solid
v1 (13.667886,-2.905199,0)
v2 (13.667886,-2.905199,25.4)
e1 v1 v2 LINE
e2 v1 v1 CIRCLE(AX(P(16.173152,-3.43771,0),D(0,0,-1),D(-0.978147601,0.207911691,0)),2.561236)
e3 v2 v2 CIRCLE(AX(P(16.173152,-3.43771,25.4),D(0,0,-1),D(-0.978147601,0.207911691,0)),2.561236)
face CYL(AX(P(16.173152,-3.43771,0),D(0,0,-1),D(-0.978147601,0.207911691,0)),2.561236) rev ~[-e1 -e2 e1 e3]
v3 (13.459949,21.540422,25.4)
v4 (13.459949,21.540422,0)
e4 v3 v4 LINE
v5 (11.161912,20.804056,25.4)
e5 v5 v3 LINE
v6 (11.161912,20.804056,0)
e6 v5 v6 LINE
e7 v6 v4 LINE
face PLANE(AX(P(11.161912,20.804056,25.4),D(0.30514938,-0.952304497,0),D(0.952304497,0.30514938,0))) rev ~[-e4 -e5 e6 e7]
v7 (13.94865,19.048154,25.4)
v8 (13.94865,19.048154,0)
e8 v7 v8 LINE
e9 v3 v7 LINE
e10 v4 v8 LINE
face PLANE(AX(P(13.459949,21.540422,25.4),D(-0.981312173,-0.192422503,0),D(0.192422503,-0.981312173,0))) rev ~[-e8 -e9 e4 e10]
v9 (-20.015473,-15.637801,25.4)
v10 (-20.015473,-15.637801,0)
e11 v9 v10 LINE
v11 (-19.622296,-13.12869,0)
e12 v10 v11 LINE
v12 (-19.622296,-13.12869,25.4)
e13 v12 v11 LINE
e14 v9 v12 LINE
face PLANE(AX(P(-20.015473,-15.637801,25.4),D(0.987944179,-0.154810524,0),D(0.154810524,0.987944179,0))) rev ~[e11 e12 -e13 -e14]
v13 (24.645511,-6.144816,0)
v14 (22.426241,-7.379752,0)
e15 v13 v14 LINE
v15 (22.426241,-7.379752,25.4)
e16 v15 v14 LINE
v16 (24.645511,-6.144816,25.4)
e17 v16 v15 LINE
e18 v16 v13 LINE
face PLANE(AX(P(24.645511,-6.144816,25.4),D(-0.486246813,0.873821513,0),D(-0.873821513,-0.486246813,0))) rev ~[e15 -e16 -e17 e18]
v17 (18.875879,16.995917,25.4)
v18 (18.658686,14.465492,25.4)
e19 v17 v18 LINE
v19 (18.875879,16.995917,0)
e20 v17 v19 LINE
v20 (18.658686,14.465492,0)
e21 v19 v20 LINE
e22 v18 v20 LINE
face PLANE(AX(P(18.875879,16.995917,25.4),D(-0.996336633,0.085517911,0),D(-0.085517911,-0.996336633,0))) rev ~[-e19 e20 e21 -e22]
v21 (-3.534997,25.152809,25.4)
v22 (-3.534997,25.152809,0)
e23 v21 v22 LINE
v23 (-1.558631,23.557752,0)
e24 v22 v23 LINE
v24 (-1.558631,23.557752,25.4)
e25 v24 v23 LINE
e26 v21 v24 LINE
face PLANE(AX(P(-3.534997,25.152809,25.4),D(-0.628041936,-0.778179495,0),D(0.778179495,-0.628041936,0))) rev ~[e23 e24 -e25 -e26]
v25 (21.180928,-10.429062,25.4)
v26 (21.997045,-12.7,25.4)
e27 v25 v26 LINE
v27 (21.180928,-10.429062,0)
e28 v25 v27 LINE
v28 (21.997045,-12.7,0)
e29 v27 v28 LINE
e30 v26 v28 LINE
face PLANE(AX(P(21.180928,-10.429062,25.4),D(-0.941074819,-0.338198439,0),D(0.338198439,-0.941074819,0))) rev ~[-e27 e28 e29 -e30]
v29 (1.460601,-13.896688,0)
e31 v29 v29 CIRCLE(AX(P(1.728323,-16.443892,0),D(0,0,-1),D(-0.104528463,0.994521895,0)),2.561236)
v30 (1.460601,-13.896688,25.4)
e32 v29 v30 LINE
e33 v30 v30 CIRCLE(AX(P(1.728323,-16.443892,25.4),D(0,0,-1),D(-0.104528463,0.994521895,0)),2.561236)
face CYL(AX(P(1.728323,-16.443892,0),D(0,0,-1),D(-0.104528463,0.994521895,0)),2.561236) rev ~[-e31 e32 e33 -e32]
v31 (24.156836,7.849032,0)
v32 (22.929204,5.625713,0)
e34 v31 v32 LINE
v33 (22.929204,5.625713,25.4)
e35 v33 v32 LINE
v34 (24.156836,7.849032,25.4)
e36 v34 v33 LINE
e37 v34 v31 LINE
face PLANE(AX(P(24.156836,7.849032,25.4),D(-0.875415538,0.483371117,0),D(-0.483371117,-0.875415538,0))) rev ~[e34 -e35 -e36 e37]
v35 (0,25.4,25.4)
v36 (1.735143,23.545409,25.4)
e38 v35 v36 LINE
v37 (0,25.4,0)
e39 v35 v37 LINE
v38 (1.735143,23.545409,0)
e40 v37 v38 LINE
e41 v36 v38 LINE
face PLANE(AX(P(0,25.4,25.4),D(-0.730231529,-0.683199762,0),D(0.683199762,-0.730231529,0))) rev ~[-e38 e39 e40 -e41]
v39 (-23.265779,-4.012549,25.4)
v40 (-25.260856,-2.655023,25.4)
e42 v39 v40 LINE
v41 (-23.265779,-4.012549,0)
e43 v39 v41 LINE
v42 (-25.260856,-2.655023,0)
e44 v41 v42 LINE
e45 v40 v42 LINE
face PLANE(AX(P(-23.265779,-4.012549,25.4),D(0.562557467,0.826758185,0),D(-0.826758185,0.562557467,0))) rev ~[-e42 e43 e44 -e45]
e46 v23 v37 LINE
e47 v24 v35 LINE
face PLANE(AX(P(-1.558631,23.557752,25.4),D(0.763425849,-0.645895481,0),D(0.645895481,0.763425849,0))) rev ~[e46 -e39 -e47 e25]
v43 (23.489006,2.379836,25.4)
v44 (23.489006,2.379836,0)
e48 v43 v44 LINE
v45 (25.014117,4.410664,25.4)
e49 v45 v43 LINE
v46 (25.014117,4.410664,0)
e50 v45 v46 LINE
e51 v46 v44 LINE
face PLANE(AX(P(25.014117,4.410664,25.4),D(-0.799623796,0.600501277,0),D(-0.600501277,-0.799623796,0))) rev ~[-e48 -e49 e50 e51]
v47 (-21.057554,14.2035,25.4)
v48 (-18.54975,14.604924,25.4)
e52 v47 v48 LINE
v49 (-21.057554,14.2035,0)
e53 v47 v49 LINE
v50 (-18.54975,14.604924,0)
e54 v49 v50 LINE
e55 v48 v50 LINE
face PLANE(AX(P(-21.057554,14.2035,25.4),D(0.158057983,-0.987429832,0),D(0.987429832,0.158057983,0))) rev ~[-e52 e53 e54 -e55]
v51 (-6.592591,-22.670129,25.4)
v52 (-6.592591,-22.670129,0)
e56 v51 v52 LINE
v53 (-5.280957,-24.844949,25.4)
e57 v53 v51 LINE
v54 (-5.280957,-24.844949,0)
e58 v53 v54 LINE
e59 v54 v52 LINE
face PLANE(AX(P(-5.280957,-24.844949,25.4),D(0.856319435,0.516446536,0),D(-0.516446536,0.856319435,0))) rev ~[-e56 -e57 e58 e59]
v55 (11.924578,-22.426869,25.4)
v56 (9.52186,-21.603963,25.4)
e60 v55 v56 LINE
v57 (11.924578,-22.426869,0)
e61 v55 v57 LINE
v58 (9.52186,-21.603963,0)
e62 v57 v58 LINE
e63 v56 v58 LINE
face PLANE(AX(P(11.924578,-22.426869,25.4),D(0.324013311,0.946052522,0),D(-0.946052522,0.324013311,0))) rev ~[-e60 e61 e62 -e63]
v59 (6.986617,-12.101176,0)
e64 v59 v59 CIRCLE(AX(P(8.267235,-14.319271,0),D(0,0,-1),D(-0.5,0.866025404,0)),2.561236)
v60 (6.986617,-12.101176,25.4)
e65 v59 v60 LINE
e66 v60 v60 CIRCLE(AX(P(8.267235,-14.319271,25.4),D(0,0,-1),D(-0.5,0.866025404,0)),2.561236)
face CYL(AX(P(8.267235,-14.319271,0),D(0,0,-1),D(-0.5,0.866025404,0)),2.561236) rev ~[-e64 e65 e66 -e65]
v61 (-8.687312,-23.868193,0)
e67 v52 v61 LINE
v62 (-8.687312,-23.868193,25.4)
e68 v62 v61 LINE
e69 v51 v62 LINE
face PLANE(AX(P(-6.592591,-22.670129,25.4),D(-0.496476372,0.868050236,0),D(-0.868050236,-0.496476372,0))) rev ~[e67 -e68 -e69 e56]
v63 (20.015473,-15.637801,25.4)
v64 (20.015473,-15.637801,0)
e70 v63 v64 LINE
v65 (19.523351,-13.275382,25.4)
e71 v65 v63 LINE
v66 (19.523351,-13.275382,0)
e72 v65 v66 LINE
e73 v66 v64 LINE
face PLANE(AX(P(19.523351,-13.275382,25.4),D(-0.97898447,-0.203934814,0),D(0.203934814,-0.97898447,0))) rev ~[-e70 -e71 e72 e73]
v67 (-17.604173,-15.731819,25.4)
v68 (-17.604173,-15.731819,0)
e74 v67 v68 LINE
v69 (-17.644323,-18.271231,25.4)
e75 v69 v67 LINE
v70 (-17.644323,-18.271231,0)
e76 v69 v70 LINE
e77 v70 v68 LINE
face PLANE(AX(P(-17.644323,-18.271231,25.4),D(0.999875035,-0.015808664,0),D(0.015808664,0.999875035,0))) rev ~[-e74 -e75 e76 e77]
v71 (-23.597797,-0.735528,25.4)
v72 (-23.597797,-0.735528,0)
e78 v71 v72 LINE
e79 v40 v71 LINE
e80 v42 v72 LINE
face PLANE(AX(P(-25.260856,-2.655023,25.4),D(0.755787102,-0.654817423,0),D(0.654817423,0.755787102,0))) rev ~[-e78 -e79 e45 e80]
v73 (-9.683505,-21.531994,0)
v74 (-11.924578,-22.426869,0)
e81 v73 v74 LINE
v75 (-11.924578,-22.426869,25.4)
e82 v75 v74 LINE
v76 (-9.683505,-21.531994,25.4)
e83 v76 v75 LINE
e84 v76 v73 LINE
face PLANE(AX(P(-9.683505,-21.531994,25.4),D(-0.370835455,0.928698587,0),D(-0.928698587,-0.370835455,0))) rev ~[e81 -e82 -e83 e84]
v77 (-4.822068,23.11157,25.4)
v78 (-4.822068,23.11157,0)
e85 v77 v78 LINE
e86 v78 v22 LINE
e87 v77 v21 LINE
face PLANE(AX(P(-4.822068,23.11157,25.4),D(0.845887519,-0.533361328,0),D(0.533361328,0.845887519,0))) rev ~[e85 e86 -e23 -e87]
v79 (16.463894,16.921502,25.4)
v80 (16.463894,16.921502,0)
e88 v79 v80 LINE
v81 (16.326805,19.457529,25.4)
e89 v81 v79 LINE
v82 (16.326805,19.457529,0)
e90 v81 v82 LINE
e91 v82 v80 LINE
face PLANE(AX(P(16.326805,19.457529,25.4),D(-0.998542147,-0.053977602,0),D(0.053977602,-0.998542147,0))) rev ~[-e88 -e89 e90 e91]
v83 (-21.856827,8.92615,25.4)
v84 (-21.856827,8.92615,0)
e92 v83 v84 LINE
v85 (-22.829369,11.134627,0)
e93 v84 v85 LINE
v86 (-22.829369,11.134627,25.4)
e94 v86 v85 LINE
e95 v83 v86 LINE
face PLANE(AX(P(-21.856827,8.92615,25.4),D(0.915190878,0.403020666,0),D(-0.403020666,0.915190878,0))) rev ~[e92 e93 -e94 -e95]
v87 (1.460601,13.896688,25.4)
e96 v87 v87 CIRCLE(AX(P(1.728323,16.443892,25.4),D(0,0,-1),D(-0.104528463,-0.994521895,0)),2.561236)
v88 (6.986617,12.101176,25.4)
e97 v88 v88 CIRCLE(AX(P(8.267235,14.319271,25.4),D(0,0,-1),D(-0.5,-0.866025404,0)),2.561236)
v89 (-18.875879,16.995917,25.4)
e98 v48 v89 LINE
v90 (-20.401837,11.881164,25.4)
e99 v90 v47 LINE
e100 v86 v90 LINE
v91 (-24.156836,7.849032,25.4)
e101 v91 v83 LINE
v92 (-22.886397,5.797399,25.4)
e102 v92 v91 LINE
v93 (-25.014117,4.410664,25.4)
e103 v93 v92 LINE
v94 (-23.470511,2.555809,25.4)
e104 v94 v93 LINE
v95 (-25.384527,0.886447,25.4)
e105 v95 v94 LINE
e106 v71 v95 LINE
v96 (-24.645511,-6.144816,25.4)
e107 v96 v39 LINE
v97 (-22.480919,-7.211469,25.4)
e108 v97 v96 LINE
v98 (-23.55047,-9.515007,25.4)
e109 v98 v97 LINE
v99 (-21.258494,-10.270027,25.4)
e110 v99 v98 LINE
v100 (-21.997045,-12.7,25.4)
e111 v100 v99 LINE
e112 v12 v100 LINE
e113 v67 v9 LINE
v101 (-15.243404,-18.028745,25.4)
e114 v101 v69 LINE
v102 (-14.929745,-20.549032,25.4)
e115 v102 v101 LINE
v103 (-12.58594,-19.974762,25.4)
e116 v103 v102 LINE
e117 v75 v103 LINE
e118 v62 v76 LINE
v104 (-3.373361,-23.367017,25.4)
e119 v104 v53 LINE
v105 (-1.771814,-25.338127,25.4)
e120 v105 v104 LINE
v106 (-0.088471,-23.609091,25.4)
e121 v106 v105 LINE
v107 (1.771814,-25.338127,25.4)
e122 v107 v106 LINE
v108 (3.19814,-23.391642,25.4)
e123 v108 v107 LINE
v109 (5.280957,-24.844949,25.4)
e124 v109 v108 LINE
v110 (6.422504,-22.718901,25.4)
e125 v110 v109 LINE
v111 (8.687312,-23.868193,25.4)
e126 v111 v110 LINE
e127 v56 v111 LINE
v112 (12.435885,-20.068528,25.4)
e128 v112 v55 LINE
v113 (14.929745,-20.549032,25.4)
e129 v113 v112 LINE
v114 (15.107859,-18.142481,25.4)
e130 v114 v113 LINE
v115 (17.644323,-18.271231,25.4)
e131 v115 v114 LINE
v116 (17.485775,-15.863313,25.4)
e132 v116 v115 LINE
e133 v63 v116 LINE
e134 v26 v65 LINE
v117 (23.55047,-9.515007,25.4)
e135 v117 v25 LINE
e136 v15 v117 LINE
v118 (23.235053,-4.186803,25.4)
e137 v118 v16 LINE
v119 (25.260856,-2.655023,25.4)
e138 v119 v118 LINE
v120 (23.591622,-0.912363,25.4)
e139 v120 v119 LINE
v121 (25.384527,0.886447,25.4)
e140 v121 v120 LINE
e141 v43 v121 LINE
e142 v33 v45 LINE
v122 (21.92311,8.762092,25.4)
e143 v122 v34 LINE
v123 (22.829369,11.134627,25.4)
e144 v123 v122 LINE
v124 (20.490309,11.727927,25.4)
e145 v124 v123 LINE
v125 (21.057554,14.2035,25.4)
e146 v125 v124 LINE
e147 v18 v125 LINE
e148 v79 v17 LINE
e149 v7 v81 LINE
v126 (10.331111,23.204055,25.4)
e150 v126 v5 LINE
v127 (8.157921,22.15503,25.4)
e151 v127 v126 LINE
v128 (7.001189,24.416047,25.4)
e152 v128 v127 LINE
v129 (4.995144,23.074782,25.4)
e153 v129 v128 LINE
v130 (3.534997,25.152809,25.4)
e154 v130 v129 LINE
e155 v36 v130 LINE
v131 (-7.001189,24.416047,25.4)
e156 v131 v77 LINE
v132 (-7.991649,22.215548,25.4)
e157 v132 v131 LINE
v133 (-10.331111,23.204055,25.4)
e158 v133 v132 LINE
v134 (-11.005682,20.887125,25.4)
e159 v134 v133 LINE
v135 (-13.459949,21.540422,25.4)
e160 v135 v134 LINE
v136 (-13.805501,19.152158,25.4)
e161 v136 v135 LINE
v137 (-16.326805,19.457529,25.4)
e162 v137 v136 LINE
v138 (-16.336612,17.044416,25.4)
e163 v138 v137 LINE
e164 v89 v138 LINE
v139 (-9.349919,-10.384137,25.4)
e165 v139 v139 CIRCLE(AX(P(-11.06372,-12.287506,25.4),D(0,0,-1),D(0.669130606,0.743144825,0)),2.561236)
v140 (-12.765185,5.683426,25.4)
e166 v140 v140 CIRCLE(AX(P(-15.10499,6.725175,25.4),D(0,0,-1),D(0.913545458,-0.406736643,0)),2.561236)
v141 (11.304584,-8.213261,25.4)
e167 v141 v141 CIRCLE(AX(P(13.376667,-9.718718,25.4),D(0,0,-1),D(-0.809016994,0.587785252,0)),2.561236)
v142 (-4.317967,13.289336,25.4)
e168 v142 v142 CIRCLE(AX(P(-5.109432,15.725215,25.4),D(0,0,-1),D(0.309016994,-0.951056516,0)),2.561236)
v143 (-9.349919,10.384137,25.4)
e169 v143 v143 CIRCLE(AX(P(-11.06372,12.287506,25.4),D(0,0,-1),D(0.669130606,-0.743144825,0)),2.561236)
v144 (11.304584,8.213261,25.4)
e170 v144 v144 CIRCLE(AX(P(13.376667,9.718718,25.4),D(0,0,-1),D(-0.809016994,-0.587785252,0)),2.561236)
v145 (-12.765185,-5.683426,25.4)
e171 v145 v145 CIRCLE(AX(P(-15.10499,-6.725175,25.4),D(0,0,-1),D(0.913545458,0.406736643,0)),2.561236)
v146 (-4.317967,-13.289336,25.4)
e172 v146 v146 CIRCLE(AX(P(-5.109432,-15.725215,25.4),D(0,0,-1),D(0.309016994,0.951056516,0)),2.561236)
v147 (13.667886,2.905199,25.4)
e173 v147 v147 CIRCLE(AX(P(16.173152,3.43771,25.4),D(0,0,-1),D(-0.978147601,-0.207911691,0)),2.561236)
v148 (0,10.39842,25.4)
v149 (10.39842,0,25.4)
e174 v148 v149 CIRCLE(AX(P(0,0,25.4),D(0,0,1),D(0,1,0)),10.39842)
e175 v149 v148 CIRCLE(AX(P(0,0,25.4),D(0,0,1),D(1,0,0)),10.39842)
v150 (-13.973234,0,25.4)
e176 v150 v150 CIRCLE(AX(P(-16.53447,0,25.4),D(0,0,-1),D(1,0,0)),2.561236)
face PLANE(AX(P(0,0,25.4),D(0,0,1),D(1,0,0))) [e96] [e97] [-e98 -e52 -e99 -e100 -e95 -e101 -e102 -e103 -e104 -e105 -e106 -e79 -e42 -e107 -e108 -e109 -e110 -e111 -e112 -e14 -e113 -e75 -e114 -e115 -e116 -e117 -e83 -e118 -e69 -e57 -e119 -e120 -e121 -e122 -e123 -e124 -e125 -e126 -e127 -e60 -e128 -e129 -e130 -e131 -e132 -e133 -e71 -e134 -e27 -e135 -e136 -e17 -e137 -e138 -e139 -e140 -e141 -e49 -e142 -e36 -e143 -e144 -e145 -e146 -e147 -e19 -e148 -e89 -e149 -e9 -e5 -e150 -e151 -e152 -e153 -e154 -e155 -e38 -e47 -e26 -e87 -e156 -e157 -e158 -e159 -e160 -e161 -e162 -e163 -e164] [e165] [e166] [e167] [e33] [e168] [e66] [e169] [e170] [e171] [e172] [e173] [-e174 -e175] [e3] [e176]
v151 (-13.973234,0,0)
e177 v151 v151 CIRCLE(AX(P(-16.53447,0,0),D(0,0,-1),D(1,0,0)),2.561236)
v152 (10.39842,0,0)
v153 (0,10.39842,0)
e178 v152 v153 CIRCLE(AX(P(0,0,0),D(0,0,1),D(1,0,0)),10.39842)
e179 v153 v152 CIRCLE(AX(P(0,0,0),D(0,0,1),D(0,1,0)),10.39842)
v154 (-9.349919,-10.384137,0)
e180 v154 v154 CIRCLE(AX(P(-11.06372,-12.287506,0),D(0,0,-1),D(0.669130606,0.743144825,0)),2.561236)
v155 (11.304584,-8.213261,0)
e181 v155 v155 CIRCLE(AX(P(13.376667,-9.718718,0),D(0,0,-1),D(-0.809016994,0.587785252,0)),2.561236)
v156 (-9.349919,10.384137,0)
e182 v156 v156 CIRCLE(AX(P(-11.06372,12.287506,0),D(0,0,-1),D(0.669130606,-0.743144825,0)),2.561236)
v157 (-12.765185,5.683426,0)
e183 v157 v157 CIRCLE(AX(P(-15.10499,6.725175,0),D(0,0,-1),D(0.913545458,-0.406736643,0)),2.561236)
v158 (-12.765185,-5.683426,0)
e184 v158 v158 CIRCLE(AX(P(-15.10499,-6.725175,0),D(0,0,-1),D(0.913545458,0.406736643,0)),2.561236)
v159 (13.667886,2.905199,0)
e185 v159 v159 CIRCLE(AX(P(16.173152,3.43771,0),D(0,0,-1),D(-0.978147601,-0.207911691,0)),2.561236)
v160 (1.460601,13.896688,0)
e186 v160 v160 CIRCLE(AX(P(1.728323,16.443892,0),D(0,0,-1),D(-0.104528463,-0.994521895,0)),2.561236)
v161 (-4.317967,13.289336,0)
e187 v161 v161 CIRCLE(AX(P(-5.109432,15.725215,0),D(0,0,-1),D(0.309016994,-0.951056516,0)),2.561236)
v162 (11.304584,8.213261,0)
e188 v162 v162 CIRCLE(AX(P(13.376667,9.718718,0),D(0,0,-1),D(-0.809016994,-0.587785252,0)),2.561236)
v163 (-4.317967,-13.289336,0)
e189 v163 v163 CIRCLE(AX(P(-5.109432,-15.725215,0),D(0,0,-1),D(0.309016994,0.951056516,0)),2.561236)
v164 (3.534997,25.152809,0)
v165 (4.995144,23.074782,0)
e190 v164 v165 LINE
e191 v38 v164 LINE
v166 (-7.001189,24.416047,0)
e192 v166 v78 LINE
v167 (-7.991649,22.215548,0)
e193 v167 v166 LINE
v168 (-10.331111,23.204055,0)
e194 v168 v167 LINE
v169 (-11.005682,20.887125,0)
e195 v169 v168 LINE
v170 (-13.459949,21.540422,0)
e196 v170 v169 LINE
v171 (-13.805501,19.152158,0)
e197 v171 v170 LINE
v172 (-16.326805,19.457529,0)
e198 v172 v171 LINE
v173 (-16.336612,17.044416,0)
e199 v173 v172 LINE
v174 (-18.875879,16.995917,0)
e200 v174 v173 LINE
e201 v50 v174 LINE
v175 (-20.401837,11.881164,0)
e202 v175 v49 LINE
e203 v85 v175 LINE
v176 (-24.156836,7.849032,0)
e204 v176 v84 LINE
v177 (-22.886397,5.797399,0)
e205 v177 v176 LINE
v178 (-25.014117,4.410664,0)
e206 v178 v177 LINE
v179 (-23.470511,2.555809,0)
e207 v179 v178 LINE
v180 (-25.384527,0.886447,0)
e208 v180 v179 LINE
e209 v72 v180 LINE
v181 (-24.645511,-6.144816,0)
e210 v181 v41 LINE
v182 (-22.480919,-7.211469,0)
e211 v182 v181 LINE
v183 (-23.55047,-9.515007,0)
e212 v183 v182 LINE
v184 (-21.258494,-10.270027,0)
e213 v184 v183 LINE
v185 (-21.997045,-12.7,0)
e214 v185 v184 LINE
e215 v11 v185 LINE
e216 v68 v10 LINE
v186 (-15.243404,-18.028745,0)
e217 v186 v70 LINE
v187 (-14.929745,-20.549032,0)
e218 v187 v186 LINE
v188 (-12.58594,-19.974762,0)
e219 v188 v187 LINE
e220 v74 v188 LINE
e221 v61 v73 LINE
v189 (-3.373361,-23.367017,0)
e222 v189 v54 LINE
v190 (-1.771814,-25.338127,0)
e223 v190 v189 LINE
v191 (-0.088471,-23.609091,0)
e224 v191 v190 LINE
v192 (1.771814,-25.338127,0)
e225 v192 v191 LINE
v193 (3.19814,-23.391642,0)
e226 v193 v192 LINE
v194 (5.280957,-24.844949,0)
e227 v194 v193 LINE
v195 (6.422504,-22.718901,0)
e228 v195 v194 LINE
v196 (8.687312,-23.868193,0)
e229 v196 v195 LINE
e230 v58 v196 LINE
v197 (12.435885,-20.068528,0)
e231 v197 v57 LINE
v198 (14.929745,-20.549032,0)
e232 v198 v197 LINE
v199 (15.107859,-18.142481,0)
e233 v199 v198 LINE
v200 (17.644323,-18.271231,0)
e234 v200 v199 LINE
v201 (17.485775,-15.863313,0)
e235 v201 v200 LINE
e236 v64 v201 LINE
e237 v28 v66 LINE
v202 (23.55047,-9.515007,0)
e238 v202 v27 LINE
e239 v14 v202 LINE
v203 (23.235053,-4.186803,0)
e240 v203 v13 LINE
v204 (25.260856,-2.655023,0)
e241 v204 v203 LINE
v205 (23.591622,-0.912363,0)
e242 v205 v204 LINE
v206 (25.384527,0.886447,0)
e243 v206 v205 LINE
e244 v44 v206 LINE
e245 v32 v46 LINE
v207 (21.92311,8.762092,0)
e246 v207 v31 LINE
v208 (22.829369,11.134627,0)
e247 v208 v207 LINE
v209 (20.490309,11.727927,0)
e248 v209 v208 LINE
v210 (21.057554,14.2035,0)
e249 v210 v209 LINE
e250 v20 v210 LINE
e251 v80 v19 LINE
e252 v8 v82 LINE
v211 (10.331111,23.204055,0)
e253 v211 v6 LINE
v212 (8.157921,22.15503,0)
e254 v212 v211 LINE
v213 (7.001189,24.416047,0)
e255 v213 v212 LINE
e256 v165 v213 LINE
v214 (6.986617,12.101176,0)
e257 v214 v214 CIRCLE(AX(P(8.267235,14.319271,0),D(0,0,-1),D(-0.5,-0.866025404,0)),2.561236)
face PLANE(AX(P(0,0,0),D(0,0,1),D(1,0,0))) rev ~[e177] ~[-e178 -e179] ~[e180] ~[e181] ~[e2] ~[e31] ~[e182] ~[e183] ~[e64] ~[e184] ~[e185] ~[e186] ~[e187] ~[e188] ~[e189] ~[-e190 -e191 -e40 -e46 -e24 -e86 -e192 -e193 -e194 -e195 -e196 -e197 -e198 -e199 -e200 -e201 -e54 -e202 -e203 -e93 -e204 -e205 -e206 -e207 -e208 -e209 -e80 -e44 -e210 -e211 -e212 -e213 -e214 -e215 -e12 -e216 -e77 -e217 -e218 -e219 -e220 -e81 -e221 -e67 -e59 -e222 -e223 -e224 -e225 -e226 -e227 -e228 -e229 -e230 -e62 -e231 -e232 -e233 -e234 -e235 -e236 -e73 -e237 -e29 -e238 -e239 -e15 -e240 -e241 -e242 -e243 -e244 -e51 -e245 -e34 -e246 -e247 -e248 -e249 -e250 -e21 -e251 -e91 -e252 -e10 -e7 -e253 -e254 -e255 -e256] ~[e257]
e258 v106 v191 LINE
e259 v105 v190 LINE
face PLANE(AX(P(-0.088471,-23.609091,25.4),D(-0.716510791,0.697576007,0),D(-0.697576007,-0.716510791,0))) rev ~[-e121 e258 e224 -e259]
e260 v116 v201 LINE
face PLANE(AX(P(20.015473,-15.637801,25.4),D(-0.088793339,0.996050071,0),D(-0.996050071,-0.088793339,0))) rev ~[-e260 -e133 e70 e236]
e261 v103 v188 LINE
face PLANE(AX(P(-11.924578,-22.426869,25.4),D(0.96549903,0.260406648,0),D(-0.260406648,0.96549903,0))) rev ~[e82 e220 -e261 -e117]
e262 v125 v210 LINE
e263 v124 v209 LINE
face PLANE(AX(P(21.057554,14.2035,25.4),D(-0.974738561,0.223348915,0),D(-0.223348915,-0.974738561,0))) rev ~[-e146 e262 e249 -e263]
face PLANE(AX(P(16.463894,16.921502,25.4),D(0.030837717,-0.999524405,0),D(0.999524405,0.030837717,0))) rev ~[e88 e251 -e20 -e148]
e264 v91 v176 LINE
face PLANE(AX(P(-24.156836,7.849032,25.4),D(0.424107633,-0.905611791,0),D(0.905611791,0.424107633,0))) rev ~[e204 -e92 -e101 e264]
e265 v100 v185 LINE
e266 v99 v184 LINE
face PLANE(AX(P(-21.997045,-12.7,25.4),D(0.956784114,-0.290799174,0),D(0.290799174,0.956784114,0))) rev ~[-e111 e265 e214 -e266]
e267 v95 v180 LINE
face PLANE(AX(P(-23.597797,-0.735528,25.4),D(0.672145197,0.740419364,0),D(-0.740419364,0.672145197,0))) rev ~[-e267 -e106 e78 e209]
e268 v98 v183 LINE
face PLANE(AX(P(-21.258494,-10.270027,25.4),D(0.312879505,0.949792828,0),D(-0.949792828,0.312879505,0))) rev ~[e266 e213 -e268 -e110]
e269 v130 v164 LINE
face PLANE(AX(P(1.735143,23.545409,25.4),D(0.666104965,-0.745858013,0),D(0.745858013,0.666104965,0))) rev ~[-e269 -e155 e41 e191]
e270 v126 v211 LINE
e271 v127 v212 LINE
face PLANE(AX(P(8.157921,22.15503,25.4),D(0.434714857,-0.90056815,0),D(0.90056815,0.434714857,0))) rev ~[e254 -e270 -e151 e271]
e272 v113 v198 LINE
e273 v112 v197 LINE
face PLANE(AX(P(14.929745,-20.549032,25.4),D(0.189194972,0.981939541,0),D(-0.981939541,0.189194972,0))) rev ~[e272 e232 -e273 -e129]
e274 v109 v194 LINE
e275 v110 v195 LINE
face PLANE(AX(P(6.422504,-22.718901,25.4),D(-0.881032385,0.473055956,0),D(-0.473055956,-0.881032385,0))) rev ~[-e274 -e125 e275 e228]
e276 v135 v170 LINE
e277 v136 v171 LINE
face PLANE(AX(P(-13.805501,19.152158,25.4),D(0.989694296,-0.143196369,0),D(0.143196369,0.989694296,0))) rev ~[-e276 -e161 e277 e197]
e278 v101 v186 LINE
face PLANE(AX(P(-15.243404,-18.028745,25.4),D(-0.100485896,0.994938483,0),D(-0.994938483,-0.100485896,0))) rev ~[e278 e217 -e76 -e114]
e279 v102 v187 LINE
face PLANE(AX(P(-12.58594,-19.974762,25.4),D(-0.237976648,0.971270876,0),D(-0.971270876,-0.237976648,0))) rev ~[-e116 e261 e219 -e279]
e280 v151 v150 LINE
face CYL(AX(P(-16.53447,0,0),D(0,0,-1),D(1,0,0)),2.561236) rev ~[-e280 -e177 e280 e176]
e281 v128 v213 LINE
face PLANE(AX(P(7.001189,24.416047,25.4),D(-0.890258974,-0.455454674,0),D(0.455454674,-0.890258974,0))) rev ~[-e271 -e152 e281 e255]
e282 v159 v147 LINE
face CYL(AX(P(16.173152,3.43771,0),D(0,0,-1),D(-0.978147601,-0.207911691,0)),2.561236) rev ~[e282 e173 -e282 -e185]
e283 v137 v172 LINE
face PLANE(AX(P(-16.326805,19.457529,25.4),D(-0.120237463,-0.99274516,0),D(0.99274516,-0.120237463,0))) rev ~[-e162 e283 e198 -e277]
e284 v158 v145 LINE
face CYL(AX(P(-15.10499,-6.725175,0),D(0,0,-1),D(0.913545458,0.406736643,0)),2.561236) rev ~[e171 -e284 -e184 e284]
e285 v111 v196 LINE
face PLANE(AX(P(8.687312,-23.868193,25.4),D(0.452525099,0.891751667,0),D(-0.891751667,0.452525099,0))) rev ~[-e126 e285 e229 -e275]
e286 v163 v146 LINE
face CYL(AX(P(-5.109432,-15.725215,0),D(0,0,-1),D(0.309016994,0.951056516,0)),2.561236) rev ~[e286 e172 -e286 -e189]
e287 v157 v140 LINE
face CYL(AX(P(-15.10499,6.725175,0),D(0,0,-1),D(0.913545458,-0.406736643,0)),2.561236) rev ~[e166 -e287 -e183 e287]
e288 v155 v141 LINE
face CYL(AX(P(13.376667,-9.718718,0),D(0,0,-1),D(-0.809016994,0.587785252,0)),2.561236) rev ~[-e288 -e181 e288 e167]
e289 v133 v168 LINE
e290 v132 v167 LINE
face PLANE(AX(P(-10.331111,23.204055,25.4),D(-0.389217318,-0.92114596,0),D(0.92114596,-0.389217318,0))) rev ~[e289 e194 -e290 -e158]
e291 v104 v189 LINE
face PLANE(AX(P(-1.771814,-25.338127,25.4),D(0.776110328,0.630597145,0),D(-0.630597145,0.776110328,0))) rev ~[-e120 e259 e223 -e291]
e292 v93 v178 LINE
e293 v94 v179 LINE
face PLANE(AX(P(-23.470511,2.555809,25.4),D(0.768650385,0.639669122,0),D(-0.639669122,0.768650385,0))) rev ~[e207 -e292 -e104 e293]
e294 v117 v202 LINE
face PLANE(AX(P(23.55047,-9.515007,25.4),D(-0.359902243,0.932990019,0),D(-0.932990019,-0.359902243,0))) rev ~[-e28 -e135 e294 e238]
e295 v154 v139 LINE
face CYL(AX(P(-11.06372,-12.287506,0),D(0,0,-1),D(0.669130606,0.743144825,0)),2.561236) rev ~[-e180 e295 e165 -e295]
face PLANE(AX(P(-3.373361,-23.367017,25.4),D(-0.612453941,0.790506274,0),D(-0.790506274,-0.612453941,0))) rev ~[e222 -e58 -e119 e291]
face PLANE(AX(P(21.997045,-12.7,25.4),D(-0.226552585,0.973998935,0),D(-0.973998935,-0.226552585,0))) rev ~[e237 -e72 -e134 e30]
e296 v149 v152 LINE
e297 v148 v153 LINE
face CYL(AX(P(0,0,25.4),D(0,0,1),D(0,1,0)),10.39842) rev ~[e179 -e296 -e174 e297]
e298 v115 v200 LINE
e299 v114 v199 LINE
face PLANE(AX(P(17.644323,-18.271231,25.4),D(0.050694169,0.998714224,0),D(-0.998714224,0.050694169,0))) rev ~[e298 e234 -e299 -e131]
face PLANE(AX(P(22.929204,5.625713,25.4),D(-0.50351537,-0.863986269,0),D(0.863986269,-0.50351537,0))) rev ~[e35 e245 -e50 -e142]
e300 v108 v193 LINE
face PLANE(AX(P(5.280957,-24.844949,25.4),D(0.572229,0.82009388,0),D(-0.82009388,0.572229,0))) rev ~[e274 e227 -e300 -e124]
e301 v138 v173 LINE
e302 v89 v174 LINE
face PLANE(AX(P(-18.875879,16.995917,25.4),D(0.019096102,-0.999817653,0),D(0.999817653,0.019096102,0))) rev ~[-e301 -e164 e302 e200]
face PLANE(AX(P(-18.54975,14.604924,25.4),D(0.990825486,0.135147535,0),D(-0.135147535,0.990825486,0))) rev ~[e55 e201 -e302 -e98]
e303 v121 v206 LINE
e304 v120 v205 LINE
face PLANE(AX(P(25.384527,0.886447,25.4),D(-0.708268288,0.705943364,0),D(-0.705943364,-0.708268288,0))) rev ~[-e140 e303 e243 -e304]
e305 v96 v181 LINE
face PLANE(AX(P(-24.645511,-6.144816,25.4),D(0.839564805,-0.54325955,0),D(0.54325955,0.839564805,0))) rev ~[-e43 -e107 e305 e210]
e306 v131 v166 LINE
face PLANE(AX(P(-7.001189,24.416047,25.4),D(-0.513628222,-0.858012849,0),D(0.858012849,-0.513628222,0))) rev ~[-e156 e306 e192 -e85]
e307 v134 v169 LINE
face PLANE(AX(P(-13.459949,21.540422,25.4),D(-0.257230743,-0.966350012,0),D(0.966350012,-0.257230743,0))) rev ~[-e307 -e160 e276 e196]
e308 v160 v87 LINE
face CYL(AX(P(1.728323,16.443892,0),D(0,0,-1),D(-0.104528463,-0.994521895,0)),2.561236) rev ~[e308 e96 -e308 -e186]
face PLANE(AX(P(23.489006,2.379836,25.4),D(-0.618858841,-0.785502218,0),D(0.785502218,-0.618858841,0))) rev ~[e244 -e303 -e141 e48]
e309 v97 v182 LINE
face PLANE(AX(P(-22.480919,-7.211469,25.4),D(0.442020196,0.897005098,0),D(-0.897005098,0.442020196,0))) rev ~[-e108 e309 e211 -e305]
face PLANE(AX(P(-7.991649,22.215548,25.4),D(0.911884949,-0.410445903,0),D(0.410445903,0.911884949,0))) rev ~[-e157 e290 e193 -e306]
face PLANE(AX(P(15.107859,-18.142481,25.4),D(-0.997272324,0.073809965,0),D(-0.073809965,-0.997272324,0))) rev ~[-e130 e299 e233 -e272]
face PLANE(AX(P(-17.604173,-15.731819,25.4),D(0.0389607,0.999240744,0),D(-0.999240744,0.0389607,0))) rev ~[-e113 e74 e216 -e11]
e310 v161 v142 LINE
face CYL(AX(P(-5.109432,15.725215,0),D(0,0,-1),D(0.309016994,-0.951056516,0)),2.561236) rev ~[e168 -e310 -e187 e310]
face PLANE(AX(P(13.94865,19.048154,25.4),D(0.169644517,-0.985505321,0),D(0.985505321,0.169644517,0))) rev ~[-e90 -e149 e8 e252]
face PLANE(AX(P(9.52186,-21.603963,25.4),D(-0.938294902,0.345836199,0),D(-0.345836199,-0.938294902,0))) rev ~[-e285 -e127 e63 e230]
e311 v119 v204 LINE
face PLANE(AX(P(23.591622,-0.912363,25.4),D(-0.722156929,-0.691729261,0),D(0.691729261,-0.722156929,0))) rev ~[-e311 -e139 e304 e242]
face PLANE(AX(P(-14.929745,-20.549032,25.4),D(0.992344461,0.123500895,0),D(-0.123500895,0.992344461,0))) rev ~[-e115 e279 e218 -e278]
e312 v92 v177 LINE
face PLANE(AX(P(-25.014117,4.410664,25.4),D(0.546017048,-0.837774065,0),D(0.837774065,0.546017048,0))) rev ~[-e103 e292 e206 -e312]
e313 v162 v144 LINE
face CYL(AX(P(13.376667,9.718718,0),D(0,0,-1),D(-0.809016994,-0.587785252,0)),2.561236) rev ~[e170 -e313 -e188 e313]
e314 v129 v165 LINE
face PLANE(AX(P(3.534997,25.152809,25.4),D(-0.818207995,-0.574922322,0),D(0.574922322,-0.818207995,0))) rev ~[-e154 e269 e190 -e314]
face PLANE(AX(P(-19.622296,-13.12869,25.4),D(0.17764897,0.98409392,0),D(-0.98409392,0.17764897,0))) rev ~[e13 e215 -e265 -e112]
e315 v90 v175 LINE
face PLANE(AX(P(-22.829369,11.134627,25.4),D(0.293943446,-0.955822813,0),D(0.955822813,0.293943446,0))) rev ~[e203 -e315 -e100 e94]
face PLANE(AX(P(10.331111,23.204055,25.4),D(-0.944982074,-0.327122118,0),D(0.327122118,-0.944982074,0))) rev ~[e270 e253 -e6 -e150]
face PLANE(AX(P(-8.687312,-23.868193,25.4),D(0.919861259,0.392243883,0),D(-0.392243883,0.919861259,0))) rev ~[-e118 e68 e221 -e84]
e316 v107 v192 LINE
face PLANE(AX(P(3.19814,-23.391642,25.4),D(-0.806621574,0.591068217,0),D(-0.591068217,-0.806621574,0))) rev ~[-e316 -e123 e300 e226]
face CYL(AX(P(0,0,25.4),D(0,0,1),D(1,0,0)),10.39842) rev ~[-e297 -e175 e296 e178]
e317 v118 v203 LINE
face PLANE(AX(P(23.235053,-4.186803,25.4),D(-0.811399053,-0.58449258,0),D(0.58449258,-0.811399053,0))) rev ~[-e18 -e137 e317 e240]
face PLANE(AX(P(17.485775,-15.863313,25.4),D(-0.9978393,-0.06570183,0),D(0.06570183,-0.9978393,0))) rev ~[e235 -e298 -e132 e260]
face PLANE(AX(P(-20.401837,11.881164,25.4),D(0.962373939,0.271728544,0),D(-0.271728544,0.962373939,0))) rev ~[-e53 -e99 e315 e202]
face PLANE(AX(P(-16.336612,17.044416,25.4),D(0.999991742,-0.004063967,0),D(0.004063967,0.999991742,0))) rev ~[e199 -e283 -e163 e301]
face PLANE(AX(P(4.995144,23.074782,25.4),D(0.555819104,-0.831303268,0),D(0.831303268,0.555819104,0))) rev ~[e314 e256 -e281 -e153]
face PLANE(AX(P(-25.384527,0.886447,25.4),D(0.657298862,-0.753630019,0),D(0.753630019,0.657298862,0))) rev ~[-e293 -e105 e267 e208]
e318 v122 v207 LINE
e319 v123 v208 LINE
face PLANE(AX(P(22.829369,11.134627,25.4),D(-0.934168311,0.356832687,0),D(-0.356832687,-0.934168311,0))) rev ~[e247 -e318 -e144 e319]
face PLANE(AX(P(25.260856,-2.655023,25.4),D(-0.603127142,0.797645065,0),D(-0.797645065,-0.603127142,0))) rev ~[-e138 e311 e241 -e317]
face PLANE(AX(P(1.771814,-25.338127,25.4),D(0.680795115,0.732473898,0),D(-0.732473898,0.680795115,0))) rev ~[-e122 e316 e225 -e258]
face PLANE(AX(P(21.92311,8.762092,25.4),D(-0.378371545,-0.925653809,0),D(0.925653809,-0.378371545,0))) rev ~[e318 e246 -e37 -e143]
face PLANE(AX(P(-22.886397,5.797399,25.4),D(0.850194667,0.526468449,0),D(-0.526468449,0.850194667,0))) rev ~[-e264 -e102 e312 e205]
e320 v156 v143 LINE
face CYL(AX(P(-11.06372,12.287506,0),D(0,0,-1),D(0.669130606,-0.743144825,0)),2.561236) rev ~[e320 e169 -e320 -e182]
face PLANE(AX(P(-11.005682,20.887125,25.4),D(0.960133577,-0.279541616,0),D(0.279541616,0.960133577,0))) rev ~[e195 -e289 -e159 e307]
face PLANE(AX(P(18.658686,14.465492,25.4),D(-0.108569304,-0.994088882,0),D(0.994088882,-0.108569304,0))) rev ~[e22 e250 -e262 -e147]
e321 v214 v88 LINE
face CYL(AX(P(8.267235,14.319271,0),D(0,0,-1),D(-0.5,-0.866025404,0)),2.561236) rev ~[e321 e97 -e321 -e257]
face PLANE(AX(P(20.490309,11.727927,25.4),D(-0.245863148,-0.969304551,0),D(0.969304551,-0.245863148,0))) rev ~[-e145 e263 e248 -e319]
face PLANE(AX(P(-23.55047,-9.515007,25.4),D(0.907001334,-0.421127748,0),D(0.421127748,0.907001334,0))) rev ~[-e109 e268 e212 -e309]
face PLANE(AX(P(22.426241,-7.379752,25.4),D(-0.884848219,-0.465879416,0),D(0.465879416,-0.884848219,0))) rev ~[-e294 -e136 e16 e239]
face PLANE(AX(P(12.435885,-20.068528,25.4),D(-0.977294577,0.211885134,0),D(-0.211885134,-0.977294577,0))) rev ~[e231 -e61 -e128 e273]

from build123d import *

# Parameters (mm, degrees)
F0_R            = 25.4
F1_DEPTH        = 25.4
F3_DEPTH        = 25.4
F6_DEPTH        = 25.4
F5_DEPTH        = 25.4
F5_COPIES_COUNT = 15


# Not quite as in the source:
# - a pattern or mirror of a feature is missing from the dataset's text; its kind, count and spacing are read off the source's solid


with BuildPart() as f1:
    # F0 (on Top) → F1 (new body)
    with BuildSketch(Plane.XY):
        Circle(F0_R)
    extrude(amount=F1_DEPTH)

    # F2 (on face) → F3 (cut)
    with BuildSketch(Plane.XY.offset(25.4)):
        with BuildLine():
            Line((-3.3733606068, -23.3670165801), (-5.2809569468, -24.8449490586))
            ThreePointArc((-5.2809569468, -24.8449490586), (-3.5349967644, -25.152808946), (-1.7718144331, -25.3381268766))
            Line((-1.7718144331, -25.3381268766), (-3.3733606068, -23.3670165801))
        make_face()
        with BuildLine():
            Line((-0.0884711356, -23.6090914373), (-1.7718144331, -25.3381268766))
            ThreePointArc((-1.7718144331, -25.3381268766), (0, -25.4), (1.7718144331, -25.3381268766))
            Line((1.7718144331, -25.3381268766), (-0.0884711356, -23.6090914373))
        make_face()
        with BuildLine():
            ThreePointArc((1.7718144331, -25.3381268766), (3.5349967644, -25.152808946), (5.2809569468, -24.8449490586))
            Line((5.2809569468, -24.8449490586), (3.1981403256, -23.3916421847))
            Line((3.1981403256, -23.3916421847), (1.7718144331, -25.3381268766))
        make_face()
        with BuildLine():
            ThreePointArc((5.2809569468, -24.8449490586), (7.0011888378, -24.4160470768), (8.6873116405, -23.868192568))
            Line((8.6873116405, -23.868192568), (6.4225036232, -22.7189012245))
            Line((6.4225036232, -22.7189012245), (5.2809569468, -24.8449490586))
        make_face()
        with BuildLine():
            ThreePointArc((8.6873116405, -23.868192568), (10.3311107341, -23.2040546241), (11.9245776948, -22.4268688586))
            Line((11.9245776948, -22.4268688586), (9.5218601932, -21.6039626944))
            Line((9.5218601932, -21.6039626944), (8.6873116405, -23.868192568))
        make_face()
        with BuildLine():
            ThreePointArc((11.9245776948, -22.4268688586), (13.4599493115, -21.5404216424), (14.9297454082, -20.5490316571))
            Line((14.9297454082, -20.5490316571), (12.4358845856, -20.0685276045))
            Line((12.4358845856, -20.0685276045), (11.9245776948, -22.4268688586))
        make_face()
        with BuildLine():
            ThreePointArc((14.9297454082, -20.5490316571), (16.326805286, -19.4575288552), (17.6443226097, -18.2712309286))
            Line((17.6443226097, -18.2712309286), (15.1078586301, -18.1424814524))
            Line((15.1078586301, -18.1424814524), (14.9297454082, -20.5490316571))
        make_face()
        with BuildLine():
            ThreePointArc((17.6443226097, -18.2712309286), (18.8758785671, -16.9959174015), (20.0154731416, -15.6378014733))
            Line((20.0154731416, -15.6378014733), (17.4857753913, -15.8633125357))
            Line((17.4857753913, -15.8633125357), (17.6443226097, -18.2712309286))
        make_face()
        with BuildLine():
            ThreePointArc((20.0154731416, -15.6378014733), (21.0575543429, -14.2034997482), (21.9970452561, -12.7))
            Line((21.9970452561, -12.7), (19.5233514242, -13.2753822847))
            Line((19.5233514242, -13.2753822847), (20.0154731416, -15.6378014733))
        make_face()
        with BuildLine():
            ThreePointArc((21.9970452561, -12.7), (22.829368776, -11.1346271284), (23.550469906, -9.5150074728))
            Line((23.550469906, -9.5150074728), (21.1809276292, -10.429061818))
            Line((21.1809276292, -10.429061818), (21.9970452561, -12.7))
        make_face()
        with BuildLine():
            ThreePointArc((23.550469906, -9.5150074728), (24.1568355139, -7.8490316571), (24.6455114474, -6.1448161482))
            Line((24.6455114474, -6.1448161482), (22.4262411709, -7.3797515259))
            Line((22.4262411709, -7.3797515259), (23.550469906, -9.5150074728))
        make_face()
        with BuildLine():
            ThreePointArc((24.6455114474, -6.1448161482), (25.0141169265, -4.4106637127), (25.2608561424, -2.655022967))
            Line((25.2608561424, -2.655022967), (23.2350534376, -4.1868027647))
            Line((23.2350534376, -4.1868027647), (24.6455114474, -6.1448161482))
        make_face()
        with BuildLine():
            ThreePointArc((25.4, 0), (25.396131457, 0.4432911235), (25.3845270063, 0.8864472162))
            Line((25.3845270063, 0.8864472162), (23.5916218186, -0.9123626502))
            Line((23.5916218186, -0.9123626502), (25.2608561424, -2.655022967))
            ThreePointArc((25.2608561424, -2.655022967), (25.3651901828, -1.3293332886), (25.4, 0))
        make_face()
        with BuildLine():
            ThreePointArc((25.3845270063, 0.8864472162), (25.2608561424, 2.655022967), (25.0141169265, 4.4106637127))
            Line((25.0141169265, 4.4106637127), (23.489006116, 2.3798355656))
            Line((23.489006116, 2.3798355656), (25.3845270063, 0.8864472162))
        make_face()
        with BuildLine():
            ThreePointArc((25.0141169265, 4.4106637127), (24.6455114474, 6.1448161482), (24.1568355139, 7.8490316571))
            Line((24.1568355139, 7.8490316571), (22.9292036277, 5.6257129891))
            Line((22.9292036277, 5.6257129891), (25.0141169265, 4.4106637127))
        make_face()
        with BuildLine():
            ThreePointArc((24.1568355139, 7.8490316571), (23.550469906, 9.5150074728), (22.829368776, 11.1346271284))
            Line((22.829368776, 11.1346271284), (21.9231102724, 8.7620923084))
            Line((21.9231102724, 8.7620923084), (24.1568355139, 7.8490316571))
        make_face()
        with BuildLine():
            ThreePointArc((22.829368776, 11.1346271284), (21.9970452561, 12.7), (21.0575543429, 14.2034997482))
            Line((21.0575543429, 14.2034997482), (20.4903085128, 11.7279274677))
            Line((20.4903085128, 11.7279274677), (22.829368776, 11.1346271284))
        make_face()
        with BuildLine():
            ThreePointArc((21.0575543429, 14.2034997482), (20.0154731416, 15.6378014733), (18.8758785671, 16.9959174015))
            Line((18.8758785671, 16.9959174015), (18.6586862054, 14.4654918592))
            Line((18.6586862054, 14.4654918592), (21.0575543429, 14.2034997482))
        make_face()
        with BuildLine():
            ThreePointArc((18.8758785671, 16.9959174015), (17.6443226097, 18.2712309286), (16.326805286, 19.4575288552))
            Line((16.326805286, 19.4575288552), (16.4638937949, 16.9215019058))
            Line((16.4638937949, 16.9215019058), (18.8758785671, 16.9959174015))
        make_face()
        with BuildLine():
            ThreePointArc((16.326805286, 19.4575288552), (14.9297454082, 20.5490316571), (13.4599493115, 21.5404216424))
            Line((13.4599493115, 21.5404216424), (13.9486504191, 19.0481541658))
            Line((13.9486504191, 19.0481541658), (16.326805286, 19.4575288552))
        make_face()
        with BuildLine():
            ThreePointArc((13.4599493115, 21.5404216424), (11.9245776948, 22.4268688586), (10.3311107341, 23.2040546241))
            Line((10.3311107341, 23.2040546241), (11.1619124293, 20.8040557719))
            Line((11.1619124293, 20.8040557719), (13.4599493115, 21.5404216424))
        make_face()
        with BuildLine():
            ThreePointArc((10.3311107341, 23.2040546241), (8.6873116405, 23.868192568), (7.0011888378, 24.4160470768))
            Line((7.0011888378, 24.4160470768), (8.1579205105, 22.1550300966))
            Line((8.1579205105, 22.1550300966), (10.3311107341, 23.2040546241))
        make_face()
        with BuildLine():
            ThreePointArc((7.0011888378, 24.4160470768), (5.2809569468, 24.8449490586), (3.5349967644, 25.152808946))
            Line((3.5349967644, 25.152808946), (4.9951439484, 23.0747819615))
            Line((4.9951439484, 23.0747819615), (7.0011888378, 24.4160470768))
        make_face()
        with BuildLine():
            ThreePointArc((3.5349967644, 25.152808946), (1.7718144331, 25.3381268766), (0, 25.4))
            Line((0, 25.4), (1.7351425913, 23.5454094427))
            Line((1.7351425913, 23.5454094427), (3.5349967644, 25.152808946))
        make_face()
        with BuildLine():
            Line((-1.5586313426, 23.5577523116), (0, 25.4))
            ThreePointArc((0, 25.4), (-1.7718144331, 25.3381268766), (-3.5349967644, 25.152808946))
            Line((-3.5349967644, 25.152808946), (-1.5586313426, 23.5577523116))
        make_face()
        with BuildLine():
            Line((-4.8220682904, 23.1115703283), (-3.5349967644, 25.152808946))
            ThreePointArc((-3.5349967644, 25.152808946), (-5.2809569468, 24.8449490586), (-7.0011888378, 24.4160470768))
            Line((-7.0011888378, 24.4160470768), (-4.8220682904, 23.1115703283))
        make_face()
        with BuildLine():
            Line((-7.9916491639, 22.2155479176), (-7.0011888378, 24.4160470768))
            ThreePointArc((-7.0011888378, 24.4160470768), (-8.6873116405, 23.868192568), (-10.3311107341, 23.2040546241))
            Line((-10.3311107341, 23.2040546241), (-7.9916491639, 22.2155479176))
        make_face()
        with BuildLine():
            Line((-11.0056816768, 20.8871251365), (-10.3311107341, 23.2040546241))
            ThreePointArc((-10.3311107341, 23.2040546241), (-11.9245776948, 22.4268688586), (-13.4599493115, 21.5404216424))
            Line((-13.4599493115, 21.5404216424), (-11.0056816768, 20.8871251365))
        make_face()
        with BuildLine():
            Line((-13.8055011147, 19.1521582233), (-13.4599493115, 21.5404216424))
            ThreePointArc((-13.4599493115, 21.5404216424), (-14.9297454082, 20.5490316571), (-16.326805286, 19.4575288552))
            Line((-16.326805286, 19.4575288552), (-13.8055011147, 19.1521582233))
        make_face()
        with BuildLine():
            Line((-16.3366121768, 17.0444163356), (-16.326805286, 19.4575288552))
            ThreePointArc((-16.326805286, 19.4575288552), (-17.6443226097, 18.2712309286), (-18.8758785671, 16.9959174015))
            Line((-18.8758785671, 16.9959174015), (-16.3366121768, 17.0444163356))
        make_face()
        with BuildLine():
            Line((-18.5497496656, 14.6049242717), (-18.8758785671, 16.9959174015))
            ThreePointArc((-18.8758785671, 16.9959174015), (-20.0154731416, 15.6378014733), (-21.0575543429, 14.2034997482))
            Line((-21.0575543429, 14.2034997482), (-18.5497496656, 14.6049242717))
        make_face()
        with BuildLine():
            Line((-20.4018373772, 11.8811639696), (-21.0575543429, 14.2034997482))
            ThreePointArc((-21.0575543429, 14.2034997482), (-21.9970452561, 12.7), (-22.829368776, 11.1346271284))
            Line((-22.829368776, 11.1346271284), (-20.4018373772, 11.8811639696))
        make_face()
        with BuildLine():
            Line((-21.856826531, 8.9261503255), (-22.829368776, 11.1346271284))
            ThreePointArc((-22.829368776, 11.1346271284), (-23.550469906, 9.5150074728), (-24.1568355139, 7.8490316571))
            Line((-24.1568355139, 7.8490316571), (-21.856826531, 8.9261503255))
        make_face()
        with BuildLine():
            Line((-22.8863974181, 5.7973993187), (-24.1568355139, 7.8490316571))
            ThreePointArc((-24.1568355139, 7.8490316571), (-24.6455114474, 6.1448161482), (-25.0141169265, 4.4106637127))
            Line((-25.0141169265, 4.4106637127), (-22.8863974181, 5.7973993187))
        make_face()
        with BuildLine():
            Line((-23.4705106123, 2.5558085286), (-25.0141169265, 4.4106637127))
            ThreePointArc((-25.0141169265, 4.4106637127), (-25.2608561424, 2.655022967), (-25.3845270063, 0.8864472162))
            Line((-25.3845270063, 0.8864472162), (-23.4705106123, 2.5558085286))
        make_face()
        with BuildLine():
            Line((-23.5977970148, -0.7355281674), (-25.3845270063, 0.8864472162))
            ThreePointArc((-25.3845270063, 0.8864472162), (-25.3845270063, -0.8864472162), (-25.2608561424, -2.655022967))
            Line((-25.2608561424, -2.655022967), (-23.5977970148, -0.7355281674))
        make_face()
        with BuildLine():
            Line((-23.2657791405, -4.0125486442), (-25.2608561424, -2.655022967))
            ThreePointArc((-25.2608561424, -2.655022967), (-25.0141169265, -4.4106637127), (-24.6455114474, -6.1448161482))
            Line((-24.6455114474, -6.1448161482), (-23.2657791405, -4.0125486442))
        make_face()
        with BuildLine():
            Line((-22.4809193397, -7.2114694259), (-24.6455114474, -6.1448161482))
            ThreePointArc((-24.6455114474, -6.1448161482), (-24.1568355139, -7.8490316571), (-23.550469906, -9.5150074728))
            Line((-23.550469906, -9.5150074728), (-22.4809193397, -7.2114694259))
        make_face()
        with BuildLine():
            Line((-21.2584940156, -10.2700271581), (-23.550469906, -9.5150074728))
            ThreePointArc((-23.550469906, -9.5150074728), (-22.829368776, -11.1346271284), (-21.9970452561, -12.7))
            Line((-21.9970452561, -12.7), (-21.2584940156, -10.2700271581))
        make_face()
        with BuildLine():
            Line((-19.6222962866, -13.1286904936), (-21.9970452561, -12.7))
            ThreePointArc((-21.9970452561, -12.7), (-21.0575543429, -14.2034997482), (-20.0154731416, -15.6378014733))
            Line((-20.0154731416, -15.6378014733), (-19.6222962866, -13.1286904936))
        make_face()
        with BuildLine():
            Line((-17.6041728805, -15.7318188024), (-20.0154731416, -15.6378014733))
            ThreePointArc((-20.0154731416, -15.6378014733), (-18.8758785671, -16.9959174015), (-17.6443226097, -18.2712309286))
            Line((-17.6443226097, -18.2712309286), (-17.6041728805, -15.7318188024))
        make_face()
        with BuildLine():
            Line((-15.2434042737, -18.0287451529), (-17.6443226097, -18.2712309286))
            ThreePointArc((-17.6443226097, -18.2712309286), (-16.326805286, -19.4575288552), (-14.9297454082, -20.5490316571))
            Line((-14.9297454082, -20.5490316571), (-15.2434042737, -18.0287451529))
        make_face()
        with BuildLine():
            Line((-12.5859401418, -19.9747624863), (-14.9297454082, -20.5490316571))
            ThreePointArc((-14.9297454082, -20.5490316571), (-13.4599493115, -21.5404216424), (-11.9245776948, -22.4268688586))
            Line((-11.9245776948, -22.4268688586), (-12.5859401418, -19.9747624863))
        make_face()
        with BuildLine():
            Line((-9.6835050014, -21.5319937889), (-11.9245776948, -22.4268688586))
            ThreePointArc((-11.9245776948, -22.4268688586), (-10.3311107341, -23.2040546241), (-8.6873116405, -23.868192568))
            Line((-8.6873116405, -23.868192568), (-9.6835050014, -21.5319937889))
        make_face()
        with BuildLine():
            Line((-6.5925914509, -22.6701293247), (-8.6873116405, -23.868192568))
            ThreePointArc((-8.6873116405, -23.868192568), (-7.0011888378, -24.4160470768), (-5.2809569468, -24.8449490586))
            Line((-5.2809569468, -24.8449490586), (-6.5925914509, -22.6701293247))
        make_face()
    extrude(amount=-F3_DEPTH, mode=Mode.SUBTRACT)

    # F2 (on face) → F6 (cut)
    with BuildSketch(Plane.XY.offset(25.4)):
        with BuildLine():
            ThreePointArc((10.3984196314, 0), (7.352793035, 7.352793035), (0, 10.3984196314))
            ThreePointArc((0, 10.3984196314), (-7.352793035, -7.352793035), (10.3984196314, 0))
        make_face()
    extrude(amount=-F6_DEPTH, mode=Mode.SUBTRACT)

    # F4 (on face) → F5 (cut, through all)
    with BuildSketch(Plane(origin=(0, 0, 0), x_dir=(1, 0, 0), z_dir=(0, 0, -1))):
        with BuildLine():
            ThreePointArc((-19.0957056503, 0), (-16.5344700217, -2.5612356286), (-13.9732343931, 0))
            Line((-13.9732343931, 0), (-19.0957056503, 0))
        make_face()
        with BuildLine():
            Line((-19.0957056503, 0), (-13.9732343931, 0))
            ThreePointArc((-13.9732343931, 0), (-16.5344700217, 2.5612356286), (-19.0957056503, 0))
        make_face()
    f5 = extrude(amount=-F5_DEPTH, mode=Mode.SUBTRACT)

    # F5_copies: F5 ×15 about axis
    f5_copies_axis = Axis((0, 0, 0), (0, 0, 1))
    for i in range(1, F5_COPIES_COUNT):
        add(f5.rotate(f5_copies_axis, i * 360 / F5_COPIES_COUNT), mode=Mode.SUBTRACT)


solid = f1.part
